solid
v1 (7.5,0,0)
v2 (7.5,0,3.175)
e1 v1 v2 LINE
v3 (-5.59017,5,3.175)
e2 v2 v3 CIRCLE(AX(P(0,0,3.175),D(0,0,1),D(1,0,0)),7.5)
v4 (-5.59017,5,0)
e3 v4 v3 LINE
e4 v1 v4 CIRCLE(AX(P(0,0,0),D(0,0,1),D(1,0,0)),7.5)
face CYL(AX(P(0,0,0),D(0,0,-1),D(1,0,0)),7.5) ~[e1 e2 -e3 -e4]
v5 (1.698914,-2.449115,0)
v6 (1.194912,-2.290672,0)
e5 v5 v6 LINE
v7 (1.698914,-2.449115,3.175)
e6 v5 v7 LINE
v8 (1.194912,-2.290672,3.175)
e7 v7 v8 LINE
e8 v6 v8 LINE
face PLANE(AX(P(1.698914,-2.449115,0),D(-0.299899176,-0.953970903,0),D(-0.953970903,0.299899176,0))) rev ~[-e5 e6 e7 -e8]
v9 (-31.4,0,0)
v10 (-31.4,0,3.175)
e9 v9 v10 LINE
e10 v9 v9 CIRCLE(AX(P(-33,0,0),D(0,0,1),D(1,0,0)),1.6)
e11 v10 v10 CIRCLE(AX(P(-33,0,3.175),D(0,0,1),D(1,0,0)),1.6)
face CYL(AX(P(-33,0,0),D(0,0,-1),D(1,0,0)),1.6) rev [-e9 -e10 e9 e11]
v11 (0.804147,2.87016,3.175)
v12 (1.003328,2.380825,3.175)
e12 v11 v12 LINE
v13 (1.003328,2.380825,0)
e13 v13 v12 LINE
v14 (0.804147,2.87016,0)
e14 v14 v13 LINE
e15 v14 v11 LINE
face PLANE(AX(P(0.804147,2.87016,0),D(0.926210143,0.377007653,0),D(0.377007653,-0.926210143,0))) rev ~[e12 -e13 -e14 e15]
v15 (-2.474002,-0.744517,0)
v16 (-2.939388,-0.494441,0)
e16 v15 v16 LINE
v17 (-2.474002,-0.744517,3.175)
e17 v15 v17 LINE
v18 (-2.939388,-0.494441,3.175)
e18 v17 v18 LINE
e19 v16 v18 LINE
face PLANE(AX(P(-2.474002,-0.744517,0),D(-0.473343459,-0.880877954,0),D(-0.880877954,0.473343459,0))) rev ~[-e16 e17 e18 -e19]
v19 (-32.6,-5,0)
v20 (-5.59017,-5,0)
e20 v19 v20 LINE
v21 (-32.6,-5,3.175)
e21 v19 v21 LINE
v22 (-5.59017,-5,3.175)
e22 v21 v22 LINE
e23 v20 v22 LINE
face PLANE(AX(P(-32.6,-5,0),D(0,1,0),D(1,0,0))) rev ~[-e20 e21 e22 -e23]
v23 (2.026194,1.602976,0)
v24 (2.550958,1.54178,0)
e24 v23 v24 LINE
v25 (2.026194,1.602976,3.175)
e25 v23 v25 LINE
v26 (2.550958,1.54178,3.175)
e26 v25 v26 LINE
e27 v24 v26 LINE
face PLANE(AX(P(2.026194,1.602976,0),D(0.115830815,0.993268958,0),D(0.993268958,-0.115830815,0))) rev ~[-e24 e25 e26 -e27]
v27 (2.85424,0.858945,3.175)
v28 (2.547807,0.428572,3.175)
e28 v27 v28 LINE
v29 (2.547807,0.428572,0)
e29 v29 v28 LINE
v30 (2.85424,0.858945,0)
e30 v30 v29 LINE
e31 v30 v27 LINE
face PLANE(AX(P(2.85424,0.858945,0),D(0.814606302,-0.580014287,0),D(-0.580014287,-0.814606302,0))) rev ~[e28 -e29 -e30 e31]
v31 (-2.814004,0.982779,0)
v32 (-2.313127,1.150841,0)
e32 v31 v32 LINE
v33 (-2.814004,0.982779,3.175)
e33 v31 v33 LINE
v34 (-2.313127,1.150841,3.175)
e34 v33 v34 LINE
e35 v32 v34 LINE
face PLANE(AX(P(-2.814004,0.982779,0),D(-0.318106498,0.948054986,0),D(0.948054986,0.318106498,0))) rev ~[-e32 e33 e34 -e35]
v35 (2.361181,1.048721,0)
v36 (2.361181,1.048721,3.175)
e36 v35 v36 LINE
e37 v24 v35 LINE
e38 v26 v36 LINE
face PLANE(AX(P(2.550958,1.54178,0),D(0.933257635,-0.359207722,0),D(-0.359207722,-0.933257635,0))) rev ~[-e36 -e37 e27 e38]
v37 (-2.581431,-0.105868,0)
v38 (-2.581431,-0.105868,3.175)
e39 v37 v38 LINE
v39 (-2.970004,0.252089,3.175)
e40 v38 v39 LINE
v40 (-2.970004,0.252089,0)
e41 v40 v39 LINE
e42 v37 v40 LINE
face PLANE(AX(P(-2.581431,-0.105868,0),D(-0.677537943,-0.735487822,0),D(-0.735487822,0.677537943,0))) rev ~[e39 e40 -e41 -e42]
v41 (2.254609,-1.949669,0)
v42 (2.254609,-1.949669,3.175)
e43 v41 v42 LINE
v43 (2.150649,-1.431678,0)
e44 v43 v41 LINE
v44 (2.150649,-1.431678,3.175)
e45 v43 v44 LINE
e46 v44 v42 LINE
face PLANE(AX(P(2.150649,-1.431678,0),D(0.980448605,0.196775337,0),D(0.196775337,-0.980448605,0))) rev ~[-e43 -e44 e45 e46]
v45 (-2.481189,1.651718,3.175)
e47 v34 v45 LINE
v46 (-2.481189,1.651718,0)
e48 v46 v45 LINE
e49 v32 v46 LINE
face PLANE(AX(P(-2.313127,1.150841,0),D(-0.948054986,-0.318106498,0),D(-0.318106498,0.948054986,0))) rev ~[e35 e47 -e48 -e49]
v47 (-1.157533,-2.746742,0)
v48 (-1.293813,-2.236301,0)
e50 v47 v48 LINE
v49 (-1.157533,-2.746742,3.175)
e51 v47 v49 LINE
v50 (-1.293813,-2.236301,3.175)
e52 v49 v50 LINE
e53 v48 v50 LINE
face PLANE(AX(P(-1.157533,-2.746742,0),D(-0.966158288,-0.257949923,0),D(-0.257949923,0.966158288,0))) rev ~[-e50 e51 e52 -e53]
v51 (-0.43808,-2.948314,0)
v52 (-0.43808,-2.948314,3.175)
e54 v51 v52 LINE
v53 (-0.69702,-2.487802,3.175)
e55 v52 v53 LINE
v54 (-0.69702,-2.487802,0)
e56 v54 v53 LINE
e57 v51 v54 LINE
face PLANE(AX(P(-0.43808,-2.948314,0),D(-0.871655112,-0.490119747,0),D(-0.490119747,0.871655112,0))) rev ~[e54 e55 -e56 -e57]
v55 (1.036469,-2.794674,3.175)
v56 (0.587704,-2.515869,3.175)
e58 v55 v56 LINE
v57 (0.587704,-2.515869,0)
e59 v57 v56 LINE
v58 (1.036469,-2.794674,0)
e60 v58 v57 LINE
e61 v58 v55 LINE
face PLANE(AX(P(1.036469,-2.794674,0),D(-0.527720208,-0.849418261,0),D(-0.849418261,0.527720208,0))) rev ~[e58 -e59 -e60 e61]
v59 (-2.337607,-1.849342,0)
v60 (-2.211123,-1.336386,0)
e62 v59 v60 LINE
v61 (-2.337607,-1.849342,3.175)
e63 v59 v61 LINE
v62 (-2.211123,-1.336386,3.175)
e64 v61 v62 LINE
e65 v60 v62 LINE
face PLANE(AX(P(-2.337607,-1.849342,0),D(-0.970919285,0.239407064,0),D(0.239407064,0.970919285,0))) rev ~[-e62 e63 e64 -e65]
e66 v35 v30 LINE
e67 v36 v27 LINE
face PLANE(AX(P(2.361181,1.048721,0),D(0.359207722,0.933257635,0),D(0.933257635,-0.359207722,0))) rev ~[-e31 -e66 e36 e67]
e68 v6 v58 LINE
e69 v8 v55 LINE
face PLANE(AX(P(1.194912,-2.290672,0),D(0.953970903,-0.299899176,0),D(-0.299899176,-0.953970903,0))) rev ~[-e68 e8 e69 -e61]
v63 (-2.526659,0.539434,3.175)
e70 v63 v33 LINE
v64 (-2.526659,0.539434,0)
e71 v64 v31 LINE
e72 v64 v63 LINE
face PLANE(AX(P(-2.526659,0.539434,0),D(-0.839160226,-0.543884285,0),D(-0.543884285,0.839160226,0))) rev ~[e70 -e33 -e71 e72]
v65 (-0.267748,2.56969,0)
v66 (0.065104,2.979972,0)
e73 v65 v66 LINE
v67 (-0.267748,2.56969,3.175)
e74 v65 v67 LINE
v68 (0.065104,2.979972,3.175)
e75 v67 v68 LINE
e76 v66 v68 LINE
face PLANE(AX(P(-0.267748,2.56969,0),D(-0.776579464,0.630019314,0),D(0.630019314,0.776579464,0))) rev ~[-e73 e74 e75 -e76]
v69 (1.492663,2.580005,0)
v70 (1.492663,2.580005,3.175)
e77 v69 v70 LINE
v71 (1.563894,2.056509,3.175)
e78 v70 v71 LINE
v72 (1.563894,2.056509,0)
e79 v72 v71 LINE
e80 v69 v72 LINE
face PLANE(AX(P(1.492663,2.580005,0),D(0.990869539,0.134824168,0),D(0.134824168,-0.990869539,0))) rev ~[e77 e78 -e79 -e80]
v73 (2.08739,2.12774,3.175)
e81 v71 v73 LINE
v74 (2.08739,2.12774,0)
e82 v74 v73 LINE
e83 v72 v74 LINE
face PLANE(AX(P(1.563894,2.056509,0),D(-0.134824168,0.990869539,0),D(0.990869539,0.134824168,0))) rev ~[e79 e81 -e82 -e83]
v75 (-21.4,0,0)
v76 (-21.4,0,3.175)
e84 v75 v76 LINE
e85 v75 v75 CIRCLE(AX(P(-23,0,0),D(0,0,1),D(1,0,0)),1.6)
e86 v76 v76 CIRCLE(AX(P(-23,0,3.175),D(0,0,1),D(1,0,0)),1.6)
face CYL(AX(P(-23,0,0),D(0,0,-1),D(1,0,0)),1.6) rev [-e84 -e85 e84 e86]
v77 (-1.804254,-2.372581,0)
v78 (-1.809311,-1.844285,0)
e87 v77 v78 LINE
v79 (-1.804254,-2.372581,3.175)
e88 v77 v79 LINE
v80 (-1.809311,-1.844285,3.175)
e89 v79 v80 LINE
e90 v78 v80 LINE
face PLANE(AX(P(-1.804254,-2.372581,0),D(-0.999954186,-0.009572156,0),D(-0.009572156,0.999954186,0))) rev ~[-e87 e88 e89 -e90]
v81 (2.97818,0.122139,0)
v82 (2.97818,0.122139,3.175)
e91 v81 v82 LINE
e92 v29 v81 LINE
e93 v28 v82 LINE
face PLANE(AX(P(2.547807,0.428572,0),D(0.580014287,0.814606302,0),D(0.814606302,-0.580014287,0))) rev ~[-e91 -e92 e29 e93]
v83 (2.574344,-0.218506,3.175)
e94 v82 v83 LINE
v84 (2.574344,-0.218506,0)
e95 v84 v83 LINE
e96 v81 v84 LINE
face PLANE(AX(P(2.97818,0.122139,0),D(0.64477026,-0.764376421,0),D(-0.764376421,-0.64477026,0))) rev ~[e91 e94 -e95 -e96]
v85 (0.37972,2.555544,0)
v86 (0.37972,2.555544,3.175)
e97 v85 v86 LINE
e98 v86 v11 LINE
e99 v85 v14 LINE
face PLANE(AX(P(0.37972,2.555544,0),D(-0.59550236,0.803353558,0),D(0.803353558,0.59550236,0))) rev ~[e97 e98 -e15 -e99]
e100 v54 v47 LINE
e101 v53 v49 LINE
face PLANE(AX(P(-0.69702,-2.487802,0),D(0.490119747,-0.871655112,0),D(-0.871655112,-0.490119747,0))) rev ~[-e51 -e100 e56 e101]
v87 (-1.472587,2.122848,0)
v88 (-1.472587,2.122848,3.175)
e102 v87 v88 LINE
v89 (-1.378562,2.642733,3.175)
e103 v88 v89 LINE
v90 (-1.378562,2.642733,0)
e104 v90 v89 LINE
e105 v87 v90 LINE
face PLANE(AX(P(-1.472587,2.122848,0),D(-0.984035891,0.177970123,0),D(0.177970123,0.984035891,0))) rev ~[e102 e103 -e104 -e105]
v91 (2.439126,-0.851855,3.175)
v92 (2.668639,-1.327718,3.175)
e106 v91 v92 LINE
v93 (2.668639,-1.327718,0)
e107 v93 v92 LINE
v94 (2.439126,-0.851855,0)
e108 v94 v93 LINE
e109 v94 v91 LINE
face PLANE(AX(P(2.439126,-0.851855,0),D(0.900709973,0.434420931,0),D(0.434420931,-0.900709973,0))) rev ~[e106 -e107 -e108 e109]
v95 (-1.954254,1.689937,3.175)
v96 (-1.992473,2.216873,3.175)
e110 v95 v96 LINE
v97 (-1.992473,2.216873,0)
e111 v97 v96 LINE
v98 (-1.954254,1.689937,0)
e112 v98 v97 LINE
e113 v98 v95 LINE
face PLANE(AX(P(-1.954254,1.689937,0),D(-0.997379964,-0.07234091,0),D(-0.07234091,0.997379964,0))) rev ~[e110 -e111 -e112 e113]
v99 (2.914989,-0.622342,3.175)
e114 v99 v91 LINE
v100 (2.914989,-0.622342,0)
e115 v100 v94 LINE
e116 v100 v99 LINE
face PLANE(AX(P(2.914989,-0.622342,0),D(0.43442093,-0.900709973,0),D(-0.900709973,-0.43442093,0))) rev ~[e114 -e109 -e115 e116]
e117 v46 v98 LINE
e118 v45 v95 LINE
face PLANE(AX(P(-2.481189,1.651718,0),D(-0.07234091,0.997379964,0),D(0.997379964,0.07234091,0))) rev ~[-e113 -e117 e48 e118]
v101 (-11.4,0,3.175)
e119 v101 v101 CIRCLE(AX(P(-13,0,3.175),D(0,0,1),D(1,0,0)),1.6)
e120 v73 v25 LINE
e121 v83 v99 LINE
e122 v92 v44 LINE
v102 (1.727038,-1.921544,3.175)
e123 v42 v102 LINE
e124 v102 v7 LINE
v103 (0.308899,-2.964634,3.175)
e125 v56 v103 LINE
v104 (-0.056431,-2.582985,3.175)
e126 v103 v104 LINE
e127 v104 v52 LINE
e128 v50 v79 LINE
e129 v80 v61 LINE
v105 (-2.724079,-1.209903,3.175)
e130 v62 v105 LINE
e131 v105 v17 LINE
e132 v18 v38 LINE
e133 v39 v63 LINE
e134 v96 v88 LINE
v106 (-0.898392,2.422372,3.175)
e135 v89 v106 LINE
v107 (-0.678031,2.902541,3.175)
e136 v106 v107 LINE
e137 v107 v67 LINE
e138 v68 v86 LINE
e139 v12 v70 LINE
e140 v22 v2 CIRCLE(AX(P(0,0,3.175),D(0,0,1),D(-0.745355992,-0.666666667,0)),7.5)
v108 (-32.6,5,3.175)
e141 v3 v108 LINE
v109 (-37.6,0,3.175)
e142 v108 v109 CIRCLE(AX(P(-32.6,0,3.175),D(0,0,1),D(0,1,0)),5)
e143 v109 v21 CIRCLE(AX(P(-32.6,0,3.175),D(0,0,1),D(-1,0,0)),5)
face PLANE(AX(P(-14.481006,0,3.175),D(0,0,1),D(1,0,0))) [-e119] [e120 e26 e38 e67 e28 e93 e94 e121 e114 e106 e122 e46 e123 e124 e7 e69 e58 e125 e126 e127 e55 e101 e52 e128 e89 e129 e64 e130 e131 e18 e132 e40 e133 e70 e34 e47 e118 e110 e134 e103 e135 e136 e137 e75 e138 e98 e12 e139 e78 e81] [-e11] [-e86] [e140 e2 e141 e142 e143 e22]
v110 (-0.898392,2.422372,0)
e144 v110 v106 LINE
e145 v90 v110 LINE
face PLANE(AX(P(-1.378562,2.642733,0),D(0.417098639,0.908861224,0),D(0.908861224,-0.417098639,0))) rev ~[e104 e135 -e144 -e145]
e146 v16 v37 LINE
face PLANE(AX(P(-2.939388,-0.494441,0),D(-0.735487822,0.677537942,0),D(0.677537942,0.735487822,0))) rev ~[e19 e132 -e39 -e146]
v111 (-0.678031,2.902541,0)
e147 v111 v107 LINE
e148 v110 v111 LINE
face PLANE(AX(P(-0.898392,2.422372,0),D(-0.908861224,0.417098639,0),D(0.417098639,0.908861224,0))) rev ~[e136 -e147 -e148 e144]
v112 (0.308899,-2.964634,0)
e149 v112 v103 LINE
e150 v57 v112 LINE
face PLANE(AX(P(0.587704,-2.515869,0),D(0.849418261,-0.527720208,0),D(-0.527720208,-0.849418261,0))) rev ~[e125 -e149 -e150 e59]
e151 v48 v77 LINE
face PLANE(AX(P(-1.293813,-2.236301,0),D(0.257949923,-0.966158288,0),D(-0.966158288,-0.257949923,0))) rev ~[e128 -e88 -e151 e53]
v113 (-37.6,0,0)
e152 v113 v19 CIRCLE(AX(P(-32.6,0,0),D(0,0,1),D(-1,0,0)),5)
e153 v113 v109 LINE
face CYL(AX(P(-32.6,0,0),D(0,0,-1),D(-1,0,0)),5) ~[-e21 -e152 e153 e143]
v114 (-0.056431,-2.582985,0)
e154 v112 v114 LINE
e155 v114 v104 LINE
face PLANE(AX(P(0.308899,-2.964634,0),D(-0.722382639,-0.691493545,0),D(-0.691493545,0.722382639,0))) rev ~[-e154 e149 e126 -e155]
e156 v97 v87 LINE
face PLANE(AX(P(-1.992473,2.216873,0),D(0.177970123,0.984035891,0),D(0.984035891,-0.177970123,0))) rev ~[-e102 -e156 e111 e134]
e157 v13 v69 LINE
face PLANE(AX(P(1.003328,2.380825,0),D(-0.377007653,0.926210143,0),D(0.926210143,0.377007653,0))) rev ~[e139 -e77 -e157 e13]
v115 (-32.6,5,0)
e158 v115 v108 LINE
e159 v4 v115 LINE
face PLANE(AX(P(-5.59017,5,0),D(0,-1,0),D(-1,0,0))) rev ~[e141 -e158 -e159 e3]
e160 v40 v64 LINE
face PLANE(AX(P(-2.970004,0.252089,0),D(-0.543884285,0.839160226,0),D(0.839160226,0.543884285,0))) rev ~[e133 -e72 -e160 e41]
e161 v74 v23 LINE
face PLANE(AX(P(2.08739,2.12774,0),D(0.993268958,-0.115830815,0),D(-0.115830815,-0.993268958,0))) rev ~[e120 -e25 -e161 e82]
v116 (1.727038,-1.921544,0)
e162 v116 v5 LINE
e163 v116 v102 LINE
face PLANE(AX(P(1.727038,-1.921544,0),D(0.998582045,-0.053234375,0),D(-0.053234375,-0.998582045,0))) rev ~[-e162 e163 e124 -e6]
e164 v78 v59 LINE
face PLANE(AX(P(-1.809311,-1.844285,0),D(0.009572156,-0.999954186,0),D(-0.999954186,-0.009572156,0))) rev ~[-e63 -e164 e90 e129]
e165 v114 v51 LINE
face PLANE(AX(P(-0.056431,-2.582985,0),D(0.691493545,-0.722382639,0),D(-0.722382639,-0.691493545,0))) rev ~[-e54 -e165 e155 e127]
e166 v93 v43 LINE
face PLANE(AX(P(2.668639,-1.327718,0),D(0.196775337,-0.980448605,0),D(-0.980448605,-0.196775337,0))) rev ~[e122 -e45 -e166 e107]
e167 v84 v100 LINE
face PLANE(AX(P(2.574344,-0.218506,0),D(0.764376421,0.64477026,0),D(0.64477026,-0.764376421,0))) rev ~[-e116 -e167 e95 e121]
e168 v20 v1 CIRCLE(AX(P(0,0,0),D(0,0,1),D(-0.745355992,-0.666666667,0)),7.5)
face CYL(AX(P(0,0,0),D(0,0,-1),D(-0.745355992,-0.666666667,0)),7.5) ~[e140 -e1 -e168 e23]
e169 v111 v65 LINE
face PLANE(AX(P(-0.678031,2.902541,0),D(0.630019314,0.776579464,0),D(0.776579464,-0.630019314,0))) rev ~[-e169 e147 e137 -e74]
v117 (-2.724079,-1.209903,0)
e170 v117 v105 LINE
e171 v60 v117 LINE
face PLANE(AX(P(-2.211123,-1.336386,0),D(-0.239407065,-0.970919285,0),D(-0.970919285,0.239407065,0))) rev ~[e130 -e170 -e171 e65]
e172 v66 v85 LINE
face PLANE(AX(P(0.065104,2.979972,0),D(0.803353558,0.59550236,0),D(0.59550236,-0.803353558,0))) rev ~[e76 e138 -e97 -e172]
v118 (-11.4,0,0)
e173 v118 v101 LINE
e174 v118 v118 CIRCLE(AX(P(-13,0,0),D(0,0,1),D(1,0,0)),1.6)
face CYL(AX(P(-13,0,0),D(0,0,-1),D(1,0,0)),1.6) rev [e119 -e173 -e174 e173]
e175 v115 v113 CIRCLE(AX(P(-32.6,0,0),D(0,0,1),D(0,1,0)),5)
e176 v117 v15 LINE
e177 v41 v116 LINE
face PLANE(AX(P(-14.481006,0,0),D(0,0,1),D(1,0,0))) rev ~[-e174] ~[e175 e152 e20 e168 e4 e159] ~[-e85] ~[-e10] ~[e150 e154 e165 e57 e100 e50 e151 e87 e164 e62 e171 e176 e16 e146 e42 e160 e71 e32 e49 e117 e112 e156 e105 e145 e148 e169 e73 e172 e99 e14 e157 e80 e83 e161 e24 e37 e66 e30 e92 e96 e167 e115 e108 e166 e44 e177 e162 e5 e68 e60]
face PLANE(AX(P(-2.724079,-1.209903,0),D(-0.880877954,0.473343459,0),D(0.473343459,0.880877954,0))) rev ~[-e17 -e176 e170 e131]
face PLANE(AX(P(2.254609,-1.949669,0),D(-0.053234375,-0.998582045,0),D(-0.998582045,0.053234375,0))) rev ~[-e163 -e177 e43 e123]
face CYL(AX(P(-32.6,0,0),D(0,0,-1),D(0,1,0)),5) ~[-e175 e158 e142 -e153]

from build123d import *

# Parameters (mm, degrees)
F0_R     = 1.6
F1_DEPTH = 3.175


with BuildPart() as f1:
    # F0 (on Top) → F1 (new body)
    with BuildSketch(Plane.XY):
        with BuildLine():
            ThreePointArc((7.5, 0), (2.6761656733, 7.0062926922), (-5.5901699437, 5))
            Line((-5.5901699437, 5), (-32.6, 5))
            ThreePointArc((-32.6, 5), (-36.1355339059, 3.5355339059), (-37.6, 0))
            ThreePointArc((-37.6, 0), (-36.1355339059, -3.5355339059), (-32.6, -5))
            Line((-32.6, -5), (-5.5901699437, -5))
            ThreePointArc((-5.5901699437, -5), (2.6761656733, -7.0062926922), (7.5, 0))
        make_face()
        with Locations((-33, 0)):
            Circle(F0_R, mode=Mode.SUBTRACT)
        with Locations((-23, 0)):
            Circle(F0_R, mode=Mode.SUBTRACT)
        with Locations((-13, 0)):
            Circle(F0_R, mode=Mode.SUBTRACT)
        Polygon((-2.3131272616, 1.150841372), (-2.4811892868, 1.651717782), (-1.9542535042, 1.6899369317), (-1.992472654, 2.2168727143), (-1.4725868119, 2.1228475389), (-1.3785616365, 2.6427333809), (-0.8983920744, 2.4223718279), (-0.6780305213, 2.90254139), (-0.2677480588, 2.5696895861), (0.0651037451, 2.9799720486), (0.379719552, 2.555544297), (0.8041473037, 2.8701601039), (1.0033279869, 2.380824761), (1.4926633298, 2.5800054442), (1.5638936344, 2.0565092492), (2.0873898293, 2.1277395538), (2.0261940932, 1.6029756981), (2.5509579489, 1.5417799619), (2.3611813253, 1.0487212884), (2.8542399989, 0.8589446648), (2.547806851, 0.4285718633), (2.9781796525, 0.1221387154), (2.574344302, -0.2185063082), (2.9149893256, -0.6223416587), (2.4391262327, -0.8518549247), (2.6686394987, -1.3277180175), (2.1506488918, -1.4316783634), (2.2546092377, -1.9496689703), (1.7270383715, -1.9215441851), (1.6989135863, -2.4491150513), (1.1949116786, -2.2906723188), (1.0364689461, -2.7946742265), (0.5877042905, -2.5158690862), (0.3088991502, -2.9646337418), (-0.0564307197, -2.5829845462), (-0.4380799154, -2.9483144161), (-0.6970199802, -2.4878015876), (-1.1575328087, -2.7467416524), (-1.2938129119, -2.2363009057), (-1.8042536586, -2.3725810089), (-1.80931082, -1.8442852134), (-2.3376066155, -1.8493423749), (-2.2111230752, -1.3363862984), (-2.7240791517, -1.209902758), (-2.4740023355, -0.7445173173), (-2.9393877762, -0.4944405012), (-2.5814309304, -0.105867575), (-2.9700038565, 0.2520892708), (-2.5266587261, 0.5394342163), (-2.8140036716, 0.9827793468), align=None, mode=Mode.SUBTRACT)
    extrude(amount=F1_DEPTH)


solid = f1.part
